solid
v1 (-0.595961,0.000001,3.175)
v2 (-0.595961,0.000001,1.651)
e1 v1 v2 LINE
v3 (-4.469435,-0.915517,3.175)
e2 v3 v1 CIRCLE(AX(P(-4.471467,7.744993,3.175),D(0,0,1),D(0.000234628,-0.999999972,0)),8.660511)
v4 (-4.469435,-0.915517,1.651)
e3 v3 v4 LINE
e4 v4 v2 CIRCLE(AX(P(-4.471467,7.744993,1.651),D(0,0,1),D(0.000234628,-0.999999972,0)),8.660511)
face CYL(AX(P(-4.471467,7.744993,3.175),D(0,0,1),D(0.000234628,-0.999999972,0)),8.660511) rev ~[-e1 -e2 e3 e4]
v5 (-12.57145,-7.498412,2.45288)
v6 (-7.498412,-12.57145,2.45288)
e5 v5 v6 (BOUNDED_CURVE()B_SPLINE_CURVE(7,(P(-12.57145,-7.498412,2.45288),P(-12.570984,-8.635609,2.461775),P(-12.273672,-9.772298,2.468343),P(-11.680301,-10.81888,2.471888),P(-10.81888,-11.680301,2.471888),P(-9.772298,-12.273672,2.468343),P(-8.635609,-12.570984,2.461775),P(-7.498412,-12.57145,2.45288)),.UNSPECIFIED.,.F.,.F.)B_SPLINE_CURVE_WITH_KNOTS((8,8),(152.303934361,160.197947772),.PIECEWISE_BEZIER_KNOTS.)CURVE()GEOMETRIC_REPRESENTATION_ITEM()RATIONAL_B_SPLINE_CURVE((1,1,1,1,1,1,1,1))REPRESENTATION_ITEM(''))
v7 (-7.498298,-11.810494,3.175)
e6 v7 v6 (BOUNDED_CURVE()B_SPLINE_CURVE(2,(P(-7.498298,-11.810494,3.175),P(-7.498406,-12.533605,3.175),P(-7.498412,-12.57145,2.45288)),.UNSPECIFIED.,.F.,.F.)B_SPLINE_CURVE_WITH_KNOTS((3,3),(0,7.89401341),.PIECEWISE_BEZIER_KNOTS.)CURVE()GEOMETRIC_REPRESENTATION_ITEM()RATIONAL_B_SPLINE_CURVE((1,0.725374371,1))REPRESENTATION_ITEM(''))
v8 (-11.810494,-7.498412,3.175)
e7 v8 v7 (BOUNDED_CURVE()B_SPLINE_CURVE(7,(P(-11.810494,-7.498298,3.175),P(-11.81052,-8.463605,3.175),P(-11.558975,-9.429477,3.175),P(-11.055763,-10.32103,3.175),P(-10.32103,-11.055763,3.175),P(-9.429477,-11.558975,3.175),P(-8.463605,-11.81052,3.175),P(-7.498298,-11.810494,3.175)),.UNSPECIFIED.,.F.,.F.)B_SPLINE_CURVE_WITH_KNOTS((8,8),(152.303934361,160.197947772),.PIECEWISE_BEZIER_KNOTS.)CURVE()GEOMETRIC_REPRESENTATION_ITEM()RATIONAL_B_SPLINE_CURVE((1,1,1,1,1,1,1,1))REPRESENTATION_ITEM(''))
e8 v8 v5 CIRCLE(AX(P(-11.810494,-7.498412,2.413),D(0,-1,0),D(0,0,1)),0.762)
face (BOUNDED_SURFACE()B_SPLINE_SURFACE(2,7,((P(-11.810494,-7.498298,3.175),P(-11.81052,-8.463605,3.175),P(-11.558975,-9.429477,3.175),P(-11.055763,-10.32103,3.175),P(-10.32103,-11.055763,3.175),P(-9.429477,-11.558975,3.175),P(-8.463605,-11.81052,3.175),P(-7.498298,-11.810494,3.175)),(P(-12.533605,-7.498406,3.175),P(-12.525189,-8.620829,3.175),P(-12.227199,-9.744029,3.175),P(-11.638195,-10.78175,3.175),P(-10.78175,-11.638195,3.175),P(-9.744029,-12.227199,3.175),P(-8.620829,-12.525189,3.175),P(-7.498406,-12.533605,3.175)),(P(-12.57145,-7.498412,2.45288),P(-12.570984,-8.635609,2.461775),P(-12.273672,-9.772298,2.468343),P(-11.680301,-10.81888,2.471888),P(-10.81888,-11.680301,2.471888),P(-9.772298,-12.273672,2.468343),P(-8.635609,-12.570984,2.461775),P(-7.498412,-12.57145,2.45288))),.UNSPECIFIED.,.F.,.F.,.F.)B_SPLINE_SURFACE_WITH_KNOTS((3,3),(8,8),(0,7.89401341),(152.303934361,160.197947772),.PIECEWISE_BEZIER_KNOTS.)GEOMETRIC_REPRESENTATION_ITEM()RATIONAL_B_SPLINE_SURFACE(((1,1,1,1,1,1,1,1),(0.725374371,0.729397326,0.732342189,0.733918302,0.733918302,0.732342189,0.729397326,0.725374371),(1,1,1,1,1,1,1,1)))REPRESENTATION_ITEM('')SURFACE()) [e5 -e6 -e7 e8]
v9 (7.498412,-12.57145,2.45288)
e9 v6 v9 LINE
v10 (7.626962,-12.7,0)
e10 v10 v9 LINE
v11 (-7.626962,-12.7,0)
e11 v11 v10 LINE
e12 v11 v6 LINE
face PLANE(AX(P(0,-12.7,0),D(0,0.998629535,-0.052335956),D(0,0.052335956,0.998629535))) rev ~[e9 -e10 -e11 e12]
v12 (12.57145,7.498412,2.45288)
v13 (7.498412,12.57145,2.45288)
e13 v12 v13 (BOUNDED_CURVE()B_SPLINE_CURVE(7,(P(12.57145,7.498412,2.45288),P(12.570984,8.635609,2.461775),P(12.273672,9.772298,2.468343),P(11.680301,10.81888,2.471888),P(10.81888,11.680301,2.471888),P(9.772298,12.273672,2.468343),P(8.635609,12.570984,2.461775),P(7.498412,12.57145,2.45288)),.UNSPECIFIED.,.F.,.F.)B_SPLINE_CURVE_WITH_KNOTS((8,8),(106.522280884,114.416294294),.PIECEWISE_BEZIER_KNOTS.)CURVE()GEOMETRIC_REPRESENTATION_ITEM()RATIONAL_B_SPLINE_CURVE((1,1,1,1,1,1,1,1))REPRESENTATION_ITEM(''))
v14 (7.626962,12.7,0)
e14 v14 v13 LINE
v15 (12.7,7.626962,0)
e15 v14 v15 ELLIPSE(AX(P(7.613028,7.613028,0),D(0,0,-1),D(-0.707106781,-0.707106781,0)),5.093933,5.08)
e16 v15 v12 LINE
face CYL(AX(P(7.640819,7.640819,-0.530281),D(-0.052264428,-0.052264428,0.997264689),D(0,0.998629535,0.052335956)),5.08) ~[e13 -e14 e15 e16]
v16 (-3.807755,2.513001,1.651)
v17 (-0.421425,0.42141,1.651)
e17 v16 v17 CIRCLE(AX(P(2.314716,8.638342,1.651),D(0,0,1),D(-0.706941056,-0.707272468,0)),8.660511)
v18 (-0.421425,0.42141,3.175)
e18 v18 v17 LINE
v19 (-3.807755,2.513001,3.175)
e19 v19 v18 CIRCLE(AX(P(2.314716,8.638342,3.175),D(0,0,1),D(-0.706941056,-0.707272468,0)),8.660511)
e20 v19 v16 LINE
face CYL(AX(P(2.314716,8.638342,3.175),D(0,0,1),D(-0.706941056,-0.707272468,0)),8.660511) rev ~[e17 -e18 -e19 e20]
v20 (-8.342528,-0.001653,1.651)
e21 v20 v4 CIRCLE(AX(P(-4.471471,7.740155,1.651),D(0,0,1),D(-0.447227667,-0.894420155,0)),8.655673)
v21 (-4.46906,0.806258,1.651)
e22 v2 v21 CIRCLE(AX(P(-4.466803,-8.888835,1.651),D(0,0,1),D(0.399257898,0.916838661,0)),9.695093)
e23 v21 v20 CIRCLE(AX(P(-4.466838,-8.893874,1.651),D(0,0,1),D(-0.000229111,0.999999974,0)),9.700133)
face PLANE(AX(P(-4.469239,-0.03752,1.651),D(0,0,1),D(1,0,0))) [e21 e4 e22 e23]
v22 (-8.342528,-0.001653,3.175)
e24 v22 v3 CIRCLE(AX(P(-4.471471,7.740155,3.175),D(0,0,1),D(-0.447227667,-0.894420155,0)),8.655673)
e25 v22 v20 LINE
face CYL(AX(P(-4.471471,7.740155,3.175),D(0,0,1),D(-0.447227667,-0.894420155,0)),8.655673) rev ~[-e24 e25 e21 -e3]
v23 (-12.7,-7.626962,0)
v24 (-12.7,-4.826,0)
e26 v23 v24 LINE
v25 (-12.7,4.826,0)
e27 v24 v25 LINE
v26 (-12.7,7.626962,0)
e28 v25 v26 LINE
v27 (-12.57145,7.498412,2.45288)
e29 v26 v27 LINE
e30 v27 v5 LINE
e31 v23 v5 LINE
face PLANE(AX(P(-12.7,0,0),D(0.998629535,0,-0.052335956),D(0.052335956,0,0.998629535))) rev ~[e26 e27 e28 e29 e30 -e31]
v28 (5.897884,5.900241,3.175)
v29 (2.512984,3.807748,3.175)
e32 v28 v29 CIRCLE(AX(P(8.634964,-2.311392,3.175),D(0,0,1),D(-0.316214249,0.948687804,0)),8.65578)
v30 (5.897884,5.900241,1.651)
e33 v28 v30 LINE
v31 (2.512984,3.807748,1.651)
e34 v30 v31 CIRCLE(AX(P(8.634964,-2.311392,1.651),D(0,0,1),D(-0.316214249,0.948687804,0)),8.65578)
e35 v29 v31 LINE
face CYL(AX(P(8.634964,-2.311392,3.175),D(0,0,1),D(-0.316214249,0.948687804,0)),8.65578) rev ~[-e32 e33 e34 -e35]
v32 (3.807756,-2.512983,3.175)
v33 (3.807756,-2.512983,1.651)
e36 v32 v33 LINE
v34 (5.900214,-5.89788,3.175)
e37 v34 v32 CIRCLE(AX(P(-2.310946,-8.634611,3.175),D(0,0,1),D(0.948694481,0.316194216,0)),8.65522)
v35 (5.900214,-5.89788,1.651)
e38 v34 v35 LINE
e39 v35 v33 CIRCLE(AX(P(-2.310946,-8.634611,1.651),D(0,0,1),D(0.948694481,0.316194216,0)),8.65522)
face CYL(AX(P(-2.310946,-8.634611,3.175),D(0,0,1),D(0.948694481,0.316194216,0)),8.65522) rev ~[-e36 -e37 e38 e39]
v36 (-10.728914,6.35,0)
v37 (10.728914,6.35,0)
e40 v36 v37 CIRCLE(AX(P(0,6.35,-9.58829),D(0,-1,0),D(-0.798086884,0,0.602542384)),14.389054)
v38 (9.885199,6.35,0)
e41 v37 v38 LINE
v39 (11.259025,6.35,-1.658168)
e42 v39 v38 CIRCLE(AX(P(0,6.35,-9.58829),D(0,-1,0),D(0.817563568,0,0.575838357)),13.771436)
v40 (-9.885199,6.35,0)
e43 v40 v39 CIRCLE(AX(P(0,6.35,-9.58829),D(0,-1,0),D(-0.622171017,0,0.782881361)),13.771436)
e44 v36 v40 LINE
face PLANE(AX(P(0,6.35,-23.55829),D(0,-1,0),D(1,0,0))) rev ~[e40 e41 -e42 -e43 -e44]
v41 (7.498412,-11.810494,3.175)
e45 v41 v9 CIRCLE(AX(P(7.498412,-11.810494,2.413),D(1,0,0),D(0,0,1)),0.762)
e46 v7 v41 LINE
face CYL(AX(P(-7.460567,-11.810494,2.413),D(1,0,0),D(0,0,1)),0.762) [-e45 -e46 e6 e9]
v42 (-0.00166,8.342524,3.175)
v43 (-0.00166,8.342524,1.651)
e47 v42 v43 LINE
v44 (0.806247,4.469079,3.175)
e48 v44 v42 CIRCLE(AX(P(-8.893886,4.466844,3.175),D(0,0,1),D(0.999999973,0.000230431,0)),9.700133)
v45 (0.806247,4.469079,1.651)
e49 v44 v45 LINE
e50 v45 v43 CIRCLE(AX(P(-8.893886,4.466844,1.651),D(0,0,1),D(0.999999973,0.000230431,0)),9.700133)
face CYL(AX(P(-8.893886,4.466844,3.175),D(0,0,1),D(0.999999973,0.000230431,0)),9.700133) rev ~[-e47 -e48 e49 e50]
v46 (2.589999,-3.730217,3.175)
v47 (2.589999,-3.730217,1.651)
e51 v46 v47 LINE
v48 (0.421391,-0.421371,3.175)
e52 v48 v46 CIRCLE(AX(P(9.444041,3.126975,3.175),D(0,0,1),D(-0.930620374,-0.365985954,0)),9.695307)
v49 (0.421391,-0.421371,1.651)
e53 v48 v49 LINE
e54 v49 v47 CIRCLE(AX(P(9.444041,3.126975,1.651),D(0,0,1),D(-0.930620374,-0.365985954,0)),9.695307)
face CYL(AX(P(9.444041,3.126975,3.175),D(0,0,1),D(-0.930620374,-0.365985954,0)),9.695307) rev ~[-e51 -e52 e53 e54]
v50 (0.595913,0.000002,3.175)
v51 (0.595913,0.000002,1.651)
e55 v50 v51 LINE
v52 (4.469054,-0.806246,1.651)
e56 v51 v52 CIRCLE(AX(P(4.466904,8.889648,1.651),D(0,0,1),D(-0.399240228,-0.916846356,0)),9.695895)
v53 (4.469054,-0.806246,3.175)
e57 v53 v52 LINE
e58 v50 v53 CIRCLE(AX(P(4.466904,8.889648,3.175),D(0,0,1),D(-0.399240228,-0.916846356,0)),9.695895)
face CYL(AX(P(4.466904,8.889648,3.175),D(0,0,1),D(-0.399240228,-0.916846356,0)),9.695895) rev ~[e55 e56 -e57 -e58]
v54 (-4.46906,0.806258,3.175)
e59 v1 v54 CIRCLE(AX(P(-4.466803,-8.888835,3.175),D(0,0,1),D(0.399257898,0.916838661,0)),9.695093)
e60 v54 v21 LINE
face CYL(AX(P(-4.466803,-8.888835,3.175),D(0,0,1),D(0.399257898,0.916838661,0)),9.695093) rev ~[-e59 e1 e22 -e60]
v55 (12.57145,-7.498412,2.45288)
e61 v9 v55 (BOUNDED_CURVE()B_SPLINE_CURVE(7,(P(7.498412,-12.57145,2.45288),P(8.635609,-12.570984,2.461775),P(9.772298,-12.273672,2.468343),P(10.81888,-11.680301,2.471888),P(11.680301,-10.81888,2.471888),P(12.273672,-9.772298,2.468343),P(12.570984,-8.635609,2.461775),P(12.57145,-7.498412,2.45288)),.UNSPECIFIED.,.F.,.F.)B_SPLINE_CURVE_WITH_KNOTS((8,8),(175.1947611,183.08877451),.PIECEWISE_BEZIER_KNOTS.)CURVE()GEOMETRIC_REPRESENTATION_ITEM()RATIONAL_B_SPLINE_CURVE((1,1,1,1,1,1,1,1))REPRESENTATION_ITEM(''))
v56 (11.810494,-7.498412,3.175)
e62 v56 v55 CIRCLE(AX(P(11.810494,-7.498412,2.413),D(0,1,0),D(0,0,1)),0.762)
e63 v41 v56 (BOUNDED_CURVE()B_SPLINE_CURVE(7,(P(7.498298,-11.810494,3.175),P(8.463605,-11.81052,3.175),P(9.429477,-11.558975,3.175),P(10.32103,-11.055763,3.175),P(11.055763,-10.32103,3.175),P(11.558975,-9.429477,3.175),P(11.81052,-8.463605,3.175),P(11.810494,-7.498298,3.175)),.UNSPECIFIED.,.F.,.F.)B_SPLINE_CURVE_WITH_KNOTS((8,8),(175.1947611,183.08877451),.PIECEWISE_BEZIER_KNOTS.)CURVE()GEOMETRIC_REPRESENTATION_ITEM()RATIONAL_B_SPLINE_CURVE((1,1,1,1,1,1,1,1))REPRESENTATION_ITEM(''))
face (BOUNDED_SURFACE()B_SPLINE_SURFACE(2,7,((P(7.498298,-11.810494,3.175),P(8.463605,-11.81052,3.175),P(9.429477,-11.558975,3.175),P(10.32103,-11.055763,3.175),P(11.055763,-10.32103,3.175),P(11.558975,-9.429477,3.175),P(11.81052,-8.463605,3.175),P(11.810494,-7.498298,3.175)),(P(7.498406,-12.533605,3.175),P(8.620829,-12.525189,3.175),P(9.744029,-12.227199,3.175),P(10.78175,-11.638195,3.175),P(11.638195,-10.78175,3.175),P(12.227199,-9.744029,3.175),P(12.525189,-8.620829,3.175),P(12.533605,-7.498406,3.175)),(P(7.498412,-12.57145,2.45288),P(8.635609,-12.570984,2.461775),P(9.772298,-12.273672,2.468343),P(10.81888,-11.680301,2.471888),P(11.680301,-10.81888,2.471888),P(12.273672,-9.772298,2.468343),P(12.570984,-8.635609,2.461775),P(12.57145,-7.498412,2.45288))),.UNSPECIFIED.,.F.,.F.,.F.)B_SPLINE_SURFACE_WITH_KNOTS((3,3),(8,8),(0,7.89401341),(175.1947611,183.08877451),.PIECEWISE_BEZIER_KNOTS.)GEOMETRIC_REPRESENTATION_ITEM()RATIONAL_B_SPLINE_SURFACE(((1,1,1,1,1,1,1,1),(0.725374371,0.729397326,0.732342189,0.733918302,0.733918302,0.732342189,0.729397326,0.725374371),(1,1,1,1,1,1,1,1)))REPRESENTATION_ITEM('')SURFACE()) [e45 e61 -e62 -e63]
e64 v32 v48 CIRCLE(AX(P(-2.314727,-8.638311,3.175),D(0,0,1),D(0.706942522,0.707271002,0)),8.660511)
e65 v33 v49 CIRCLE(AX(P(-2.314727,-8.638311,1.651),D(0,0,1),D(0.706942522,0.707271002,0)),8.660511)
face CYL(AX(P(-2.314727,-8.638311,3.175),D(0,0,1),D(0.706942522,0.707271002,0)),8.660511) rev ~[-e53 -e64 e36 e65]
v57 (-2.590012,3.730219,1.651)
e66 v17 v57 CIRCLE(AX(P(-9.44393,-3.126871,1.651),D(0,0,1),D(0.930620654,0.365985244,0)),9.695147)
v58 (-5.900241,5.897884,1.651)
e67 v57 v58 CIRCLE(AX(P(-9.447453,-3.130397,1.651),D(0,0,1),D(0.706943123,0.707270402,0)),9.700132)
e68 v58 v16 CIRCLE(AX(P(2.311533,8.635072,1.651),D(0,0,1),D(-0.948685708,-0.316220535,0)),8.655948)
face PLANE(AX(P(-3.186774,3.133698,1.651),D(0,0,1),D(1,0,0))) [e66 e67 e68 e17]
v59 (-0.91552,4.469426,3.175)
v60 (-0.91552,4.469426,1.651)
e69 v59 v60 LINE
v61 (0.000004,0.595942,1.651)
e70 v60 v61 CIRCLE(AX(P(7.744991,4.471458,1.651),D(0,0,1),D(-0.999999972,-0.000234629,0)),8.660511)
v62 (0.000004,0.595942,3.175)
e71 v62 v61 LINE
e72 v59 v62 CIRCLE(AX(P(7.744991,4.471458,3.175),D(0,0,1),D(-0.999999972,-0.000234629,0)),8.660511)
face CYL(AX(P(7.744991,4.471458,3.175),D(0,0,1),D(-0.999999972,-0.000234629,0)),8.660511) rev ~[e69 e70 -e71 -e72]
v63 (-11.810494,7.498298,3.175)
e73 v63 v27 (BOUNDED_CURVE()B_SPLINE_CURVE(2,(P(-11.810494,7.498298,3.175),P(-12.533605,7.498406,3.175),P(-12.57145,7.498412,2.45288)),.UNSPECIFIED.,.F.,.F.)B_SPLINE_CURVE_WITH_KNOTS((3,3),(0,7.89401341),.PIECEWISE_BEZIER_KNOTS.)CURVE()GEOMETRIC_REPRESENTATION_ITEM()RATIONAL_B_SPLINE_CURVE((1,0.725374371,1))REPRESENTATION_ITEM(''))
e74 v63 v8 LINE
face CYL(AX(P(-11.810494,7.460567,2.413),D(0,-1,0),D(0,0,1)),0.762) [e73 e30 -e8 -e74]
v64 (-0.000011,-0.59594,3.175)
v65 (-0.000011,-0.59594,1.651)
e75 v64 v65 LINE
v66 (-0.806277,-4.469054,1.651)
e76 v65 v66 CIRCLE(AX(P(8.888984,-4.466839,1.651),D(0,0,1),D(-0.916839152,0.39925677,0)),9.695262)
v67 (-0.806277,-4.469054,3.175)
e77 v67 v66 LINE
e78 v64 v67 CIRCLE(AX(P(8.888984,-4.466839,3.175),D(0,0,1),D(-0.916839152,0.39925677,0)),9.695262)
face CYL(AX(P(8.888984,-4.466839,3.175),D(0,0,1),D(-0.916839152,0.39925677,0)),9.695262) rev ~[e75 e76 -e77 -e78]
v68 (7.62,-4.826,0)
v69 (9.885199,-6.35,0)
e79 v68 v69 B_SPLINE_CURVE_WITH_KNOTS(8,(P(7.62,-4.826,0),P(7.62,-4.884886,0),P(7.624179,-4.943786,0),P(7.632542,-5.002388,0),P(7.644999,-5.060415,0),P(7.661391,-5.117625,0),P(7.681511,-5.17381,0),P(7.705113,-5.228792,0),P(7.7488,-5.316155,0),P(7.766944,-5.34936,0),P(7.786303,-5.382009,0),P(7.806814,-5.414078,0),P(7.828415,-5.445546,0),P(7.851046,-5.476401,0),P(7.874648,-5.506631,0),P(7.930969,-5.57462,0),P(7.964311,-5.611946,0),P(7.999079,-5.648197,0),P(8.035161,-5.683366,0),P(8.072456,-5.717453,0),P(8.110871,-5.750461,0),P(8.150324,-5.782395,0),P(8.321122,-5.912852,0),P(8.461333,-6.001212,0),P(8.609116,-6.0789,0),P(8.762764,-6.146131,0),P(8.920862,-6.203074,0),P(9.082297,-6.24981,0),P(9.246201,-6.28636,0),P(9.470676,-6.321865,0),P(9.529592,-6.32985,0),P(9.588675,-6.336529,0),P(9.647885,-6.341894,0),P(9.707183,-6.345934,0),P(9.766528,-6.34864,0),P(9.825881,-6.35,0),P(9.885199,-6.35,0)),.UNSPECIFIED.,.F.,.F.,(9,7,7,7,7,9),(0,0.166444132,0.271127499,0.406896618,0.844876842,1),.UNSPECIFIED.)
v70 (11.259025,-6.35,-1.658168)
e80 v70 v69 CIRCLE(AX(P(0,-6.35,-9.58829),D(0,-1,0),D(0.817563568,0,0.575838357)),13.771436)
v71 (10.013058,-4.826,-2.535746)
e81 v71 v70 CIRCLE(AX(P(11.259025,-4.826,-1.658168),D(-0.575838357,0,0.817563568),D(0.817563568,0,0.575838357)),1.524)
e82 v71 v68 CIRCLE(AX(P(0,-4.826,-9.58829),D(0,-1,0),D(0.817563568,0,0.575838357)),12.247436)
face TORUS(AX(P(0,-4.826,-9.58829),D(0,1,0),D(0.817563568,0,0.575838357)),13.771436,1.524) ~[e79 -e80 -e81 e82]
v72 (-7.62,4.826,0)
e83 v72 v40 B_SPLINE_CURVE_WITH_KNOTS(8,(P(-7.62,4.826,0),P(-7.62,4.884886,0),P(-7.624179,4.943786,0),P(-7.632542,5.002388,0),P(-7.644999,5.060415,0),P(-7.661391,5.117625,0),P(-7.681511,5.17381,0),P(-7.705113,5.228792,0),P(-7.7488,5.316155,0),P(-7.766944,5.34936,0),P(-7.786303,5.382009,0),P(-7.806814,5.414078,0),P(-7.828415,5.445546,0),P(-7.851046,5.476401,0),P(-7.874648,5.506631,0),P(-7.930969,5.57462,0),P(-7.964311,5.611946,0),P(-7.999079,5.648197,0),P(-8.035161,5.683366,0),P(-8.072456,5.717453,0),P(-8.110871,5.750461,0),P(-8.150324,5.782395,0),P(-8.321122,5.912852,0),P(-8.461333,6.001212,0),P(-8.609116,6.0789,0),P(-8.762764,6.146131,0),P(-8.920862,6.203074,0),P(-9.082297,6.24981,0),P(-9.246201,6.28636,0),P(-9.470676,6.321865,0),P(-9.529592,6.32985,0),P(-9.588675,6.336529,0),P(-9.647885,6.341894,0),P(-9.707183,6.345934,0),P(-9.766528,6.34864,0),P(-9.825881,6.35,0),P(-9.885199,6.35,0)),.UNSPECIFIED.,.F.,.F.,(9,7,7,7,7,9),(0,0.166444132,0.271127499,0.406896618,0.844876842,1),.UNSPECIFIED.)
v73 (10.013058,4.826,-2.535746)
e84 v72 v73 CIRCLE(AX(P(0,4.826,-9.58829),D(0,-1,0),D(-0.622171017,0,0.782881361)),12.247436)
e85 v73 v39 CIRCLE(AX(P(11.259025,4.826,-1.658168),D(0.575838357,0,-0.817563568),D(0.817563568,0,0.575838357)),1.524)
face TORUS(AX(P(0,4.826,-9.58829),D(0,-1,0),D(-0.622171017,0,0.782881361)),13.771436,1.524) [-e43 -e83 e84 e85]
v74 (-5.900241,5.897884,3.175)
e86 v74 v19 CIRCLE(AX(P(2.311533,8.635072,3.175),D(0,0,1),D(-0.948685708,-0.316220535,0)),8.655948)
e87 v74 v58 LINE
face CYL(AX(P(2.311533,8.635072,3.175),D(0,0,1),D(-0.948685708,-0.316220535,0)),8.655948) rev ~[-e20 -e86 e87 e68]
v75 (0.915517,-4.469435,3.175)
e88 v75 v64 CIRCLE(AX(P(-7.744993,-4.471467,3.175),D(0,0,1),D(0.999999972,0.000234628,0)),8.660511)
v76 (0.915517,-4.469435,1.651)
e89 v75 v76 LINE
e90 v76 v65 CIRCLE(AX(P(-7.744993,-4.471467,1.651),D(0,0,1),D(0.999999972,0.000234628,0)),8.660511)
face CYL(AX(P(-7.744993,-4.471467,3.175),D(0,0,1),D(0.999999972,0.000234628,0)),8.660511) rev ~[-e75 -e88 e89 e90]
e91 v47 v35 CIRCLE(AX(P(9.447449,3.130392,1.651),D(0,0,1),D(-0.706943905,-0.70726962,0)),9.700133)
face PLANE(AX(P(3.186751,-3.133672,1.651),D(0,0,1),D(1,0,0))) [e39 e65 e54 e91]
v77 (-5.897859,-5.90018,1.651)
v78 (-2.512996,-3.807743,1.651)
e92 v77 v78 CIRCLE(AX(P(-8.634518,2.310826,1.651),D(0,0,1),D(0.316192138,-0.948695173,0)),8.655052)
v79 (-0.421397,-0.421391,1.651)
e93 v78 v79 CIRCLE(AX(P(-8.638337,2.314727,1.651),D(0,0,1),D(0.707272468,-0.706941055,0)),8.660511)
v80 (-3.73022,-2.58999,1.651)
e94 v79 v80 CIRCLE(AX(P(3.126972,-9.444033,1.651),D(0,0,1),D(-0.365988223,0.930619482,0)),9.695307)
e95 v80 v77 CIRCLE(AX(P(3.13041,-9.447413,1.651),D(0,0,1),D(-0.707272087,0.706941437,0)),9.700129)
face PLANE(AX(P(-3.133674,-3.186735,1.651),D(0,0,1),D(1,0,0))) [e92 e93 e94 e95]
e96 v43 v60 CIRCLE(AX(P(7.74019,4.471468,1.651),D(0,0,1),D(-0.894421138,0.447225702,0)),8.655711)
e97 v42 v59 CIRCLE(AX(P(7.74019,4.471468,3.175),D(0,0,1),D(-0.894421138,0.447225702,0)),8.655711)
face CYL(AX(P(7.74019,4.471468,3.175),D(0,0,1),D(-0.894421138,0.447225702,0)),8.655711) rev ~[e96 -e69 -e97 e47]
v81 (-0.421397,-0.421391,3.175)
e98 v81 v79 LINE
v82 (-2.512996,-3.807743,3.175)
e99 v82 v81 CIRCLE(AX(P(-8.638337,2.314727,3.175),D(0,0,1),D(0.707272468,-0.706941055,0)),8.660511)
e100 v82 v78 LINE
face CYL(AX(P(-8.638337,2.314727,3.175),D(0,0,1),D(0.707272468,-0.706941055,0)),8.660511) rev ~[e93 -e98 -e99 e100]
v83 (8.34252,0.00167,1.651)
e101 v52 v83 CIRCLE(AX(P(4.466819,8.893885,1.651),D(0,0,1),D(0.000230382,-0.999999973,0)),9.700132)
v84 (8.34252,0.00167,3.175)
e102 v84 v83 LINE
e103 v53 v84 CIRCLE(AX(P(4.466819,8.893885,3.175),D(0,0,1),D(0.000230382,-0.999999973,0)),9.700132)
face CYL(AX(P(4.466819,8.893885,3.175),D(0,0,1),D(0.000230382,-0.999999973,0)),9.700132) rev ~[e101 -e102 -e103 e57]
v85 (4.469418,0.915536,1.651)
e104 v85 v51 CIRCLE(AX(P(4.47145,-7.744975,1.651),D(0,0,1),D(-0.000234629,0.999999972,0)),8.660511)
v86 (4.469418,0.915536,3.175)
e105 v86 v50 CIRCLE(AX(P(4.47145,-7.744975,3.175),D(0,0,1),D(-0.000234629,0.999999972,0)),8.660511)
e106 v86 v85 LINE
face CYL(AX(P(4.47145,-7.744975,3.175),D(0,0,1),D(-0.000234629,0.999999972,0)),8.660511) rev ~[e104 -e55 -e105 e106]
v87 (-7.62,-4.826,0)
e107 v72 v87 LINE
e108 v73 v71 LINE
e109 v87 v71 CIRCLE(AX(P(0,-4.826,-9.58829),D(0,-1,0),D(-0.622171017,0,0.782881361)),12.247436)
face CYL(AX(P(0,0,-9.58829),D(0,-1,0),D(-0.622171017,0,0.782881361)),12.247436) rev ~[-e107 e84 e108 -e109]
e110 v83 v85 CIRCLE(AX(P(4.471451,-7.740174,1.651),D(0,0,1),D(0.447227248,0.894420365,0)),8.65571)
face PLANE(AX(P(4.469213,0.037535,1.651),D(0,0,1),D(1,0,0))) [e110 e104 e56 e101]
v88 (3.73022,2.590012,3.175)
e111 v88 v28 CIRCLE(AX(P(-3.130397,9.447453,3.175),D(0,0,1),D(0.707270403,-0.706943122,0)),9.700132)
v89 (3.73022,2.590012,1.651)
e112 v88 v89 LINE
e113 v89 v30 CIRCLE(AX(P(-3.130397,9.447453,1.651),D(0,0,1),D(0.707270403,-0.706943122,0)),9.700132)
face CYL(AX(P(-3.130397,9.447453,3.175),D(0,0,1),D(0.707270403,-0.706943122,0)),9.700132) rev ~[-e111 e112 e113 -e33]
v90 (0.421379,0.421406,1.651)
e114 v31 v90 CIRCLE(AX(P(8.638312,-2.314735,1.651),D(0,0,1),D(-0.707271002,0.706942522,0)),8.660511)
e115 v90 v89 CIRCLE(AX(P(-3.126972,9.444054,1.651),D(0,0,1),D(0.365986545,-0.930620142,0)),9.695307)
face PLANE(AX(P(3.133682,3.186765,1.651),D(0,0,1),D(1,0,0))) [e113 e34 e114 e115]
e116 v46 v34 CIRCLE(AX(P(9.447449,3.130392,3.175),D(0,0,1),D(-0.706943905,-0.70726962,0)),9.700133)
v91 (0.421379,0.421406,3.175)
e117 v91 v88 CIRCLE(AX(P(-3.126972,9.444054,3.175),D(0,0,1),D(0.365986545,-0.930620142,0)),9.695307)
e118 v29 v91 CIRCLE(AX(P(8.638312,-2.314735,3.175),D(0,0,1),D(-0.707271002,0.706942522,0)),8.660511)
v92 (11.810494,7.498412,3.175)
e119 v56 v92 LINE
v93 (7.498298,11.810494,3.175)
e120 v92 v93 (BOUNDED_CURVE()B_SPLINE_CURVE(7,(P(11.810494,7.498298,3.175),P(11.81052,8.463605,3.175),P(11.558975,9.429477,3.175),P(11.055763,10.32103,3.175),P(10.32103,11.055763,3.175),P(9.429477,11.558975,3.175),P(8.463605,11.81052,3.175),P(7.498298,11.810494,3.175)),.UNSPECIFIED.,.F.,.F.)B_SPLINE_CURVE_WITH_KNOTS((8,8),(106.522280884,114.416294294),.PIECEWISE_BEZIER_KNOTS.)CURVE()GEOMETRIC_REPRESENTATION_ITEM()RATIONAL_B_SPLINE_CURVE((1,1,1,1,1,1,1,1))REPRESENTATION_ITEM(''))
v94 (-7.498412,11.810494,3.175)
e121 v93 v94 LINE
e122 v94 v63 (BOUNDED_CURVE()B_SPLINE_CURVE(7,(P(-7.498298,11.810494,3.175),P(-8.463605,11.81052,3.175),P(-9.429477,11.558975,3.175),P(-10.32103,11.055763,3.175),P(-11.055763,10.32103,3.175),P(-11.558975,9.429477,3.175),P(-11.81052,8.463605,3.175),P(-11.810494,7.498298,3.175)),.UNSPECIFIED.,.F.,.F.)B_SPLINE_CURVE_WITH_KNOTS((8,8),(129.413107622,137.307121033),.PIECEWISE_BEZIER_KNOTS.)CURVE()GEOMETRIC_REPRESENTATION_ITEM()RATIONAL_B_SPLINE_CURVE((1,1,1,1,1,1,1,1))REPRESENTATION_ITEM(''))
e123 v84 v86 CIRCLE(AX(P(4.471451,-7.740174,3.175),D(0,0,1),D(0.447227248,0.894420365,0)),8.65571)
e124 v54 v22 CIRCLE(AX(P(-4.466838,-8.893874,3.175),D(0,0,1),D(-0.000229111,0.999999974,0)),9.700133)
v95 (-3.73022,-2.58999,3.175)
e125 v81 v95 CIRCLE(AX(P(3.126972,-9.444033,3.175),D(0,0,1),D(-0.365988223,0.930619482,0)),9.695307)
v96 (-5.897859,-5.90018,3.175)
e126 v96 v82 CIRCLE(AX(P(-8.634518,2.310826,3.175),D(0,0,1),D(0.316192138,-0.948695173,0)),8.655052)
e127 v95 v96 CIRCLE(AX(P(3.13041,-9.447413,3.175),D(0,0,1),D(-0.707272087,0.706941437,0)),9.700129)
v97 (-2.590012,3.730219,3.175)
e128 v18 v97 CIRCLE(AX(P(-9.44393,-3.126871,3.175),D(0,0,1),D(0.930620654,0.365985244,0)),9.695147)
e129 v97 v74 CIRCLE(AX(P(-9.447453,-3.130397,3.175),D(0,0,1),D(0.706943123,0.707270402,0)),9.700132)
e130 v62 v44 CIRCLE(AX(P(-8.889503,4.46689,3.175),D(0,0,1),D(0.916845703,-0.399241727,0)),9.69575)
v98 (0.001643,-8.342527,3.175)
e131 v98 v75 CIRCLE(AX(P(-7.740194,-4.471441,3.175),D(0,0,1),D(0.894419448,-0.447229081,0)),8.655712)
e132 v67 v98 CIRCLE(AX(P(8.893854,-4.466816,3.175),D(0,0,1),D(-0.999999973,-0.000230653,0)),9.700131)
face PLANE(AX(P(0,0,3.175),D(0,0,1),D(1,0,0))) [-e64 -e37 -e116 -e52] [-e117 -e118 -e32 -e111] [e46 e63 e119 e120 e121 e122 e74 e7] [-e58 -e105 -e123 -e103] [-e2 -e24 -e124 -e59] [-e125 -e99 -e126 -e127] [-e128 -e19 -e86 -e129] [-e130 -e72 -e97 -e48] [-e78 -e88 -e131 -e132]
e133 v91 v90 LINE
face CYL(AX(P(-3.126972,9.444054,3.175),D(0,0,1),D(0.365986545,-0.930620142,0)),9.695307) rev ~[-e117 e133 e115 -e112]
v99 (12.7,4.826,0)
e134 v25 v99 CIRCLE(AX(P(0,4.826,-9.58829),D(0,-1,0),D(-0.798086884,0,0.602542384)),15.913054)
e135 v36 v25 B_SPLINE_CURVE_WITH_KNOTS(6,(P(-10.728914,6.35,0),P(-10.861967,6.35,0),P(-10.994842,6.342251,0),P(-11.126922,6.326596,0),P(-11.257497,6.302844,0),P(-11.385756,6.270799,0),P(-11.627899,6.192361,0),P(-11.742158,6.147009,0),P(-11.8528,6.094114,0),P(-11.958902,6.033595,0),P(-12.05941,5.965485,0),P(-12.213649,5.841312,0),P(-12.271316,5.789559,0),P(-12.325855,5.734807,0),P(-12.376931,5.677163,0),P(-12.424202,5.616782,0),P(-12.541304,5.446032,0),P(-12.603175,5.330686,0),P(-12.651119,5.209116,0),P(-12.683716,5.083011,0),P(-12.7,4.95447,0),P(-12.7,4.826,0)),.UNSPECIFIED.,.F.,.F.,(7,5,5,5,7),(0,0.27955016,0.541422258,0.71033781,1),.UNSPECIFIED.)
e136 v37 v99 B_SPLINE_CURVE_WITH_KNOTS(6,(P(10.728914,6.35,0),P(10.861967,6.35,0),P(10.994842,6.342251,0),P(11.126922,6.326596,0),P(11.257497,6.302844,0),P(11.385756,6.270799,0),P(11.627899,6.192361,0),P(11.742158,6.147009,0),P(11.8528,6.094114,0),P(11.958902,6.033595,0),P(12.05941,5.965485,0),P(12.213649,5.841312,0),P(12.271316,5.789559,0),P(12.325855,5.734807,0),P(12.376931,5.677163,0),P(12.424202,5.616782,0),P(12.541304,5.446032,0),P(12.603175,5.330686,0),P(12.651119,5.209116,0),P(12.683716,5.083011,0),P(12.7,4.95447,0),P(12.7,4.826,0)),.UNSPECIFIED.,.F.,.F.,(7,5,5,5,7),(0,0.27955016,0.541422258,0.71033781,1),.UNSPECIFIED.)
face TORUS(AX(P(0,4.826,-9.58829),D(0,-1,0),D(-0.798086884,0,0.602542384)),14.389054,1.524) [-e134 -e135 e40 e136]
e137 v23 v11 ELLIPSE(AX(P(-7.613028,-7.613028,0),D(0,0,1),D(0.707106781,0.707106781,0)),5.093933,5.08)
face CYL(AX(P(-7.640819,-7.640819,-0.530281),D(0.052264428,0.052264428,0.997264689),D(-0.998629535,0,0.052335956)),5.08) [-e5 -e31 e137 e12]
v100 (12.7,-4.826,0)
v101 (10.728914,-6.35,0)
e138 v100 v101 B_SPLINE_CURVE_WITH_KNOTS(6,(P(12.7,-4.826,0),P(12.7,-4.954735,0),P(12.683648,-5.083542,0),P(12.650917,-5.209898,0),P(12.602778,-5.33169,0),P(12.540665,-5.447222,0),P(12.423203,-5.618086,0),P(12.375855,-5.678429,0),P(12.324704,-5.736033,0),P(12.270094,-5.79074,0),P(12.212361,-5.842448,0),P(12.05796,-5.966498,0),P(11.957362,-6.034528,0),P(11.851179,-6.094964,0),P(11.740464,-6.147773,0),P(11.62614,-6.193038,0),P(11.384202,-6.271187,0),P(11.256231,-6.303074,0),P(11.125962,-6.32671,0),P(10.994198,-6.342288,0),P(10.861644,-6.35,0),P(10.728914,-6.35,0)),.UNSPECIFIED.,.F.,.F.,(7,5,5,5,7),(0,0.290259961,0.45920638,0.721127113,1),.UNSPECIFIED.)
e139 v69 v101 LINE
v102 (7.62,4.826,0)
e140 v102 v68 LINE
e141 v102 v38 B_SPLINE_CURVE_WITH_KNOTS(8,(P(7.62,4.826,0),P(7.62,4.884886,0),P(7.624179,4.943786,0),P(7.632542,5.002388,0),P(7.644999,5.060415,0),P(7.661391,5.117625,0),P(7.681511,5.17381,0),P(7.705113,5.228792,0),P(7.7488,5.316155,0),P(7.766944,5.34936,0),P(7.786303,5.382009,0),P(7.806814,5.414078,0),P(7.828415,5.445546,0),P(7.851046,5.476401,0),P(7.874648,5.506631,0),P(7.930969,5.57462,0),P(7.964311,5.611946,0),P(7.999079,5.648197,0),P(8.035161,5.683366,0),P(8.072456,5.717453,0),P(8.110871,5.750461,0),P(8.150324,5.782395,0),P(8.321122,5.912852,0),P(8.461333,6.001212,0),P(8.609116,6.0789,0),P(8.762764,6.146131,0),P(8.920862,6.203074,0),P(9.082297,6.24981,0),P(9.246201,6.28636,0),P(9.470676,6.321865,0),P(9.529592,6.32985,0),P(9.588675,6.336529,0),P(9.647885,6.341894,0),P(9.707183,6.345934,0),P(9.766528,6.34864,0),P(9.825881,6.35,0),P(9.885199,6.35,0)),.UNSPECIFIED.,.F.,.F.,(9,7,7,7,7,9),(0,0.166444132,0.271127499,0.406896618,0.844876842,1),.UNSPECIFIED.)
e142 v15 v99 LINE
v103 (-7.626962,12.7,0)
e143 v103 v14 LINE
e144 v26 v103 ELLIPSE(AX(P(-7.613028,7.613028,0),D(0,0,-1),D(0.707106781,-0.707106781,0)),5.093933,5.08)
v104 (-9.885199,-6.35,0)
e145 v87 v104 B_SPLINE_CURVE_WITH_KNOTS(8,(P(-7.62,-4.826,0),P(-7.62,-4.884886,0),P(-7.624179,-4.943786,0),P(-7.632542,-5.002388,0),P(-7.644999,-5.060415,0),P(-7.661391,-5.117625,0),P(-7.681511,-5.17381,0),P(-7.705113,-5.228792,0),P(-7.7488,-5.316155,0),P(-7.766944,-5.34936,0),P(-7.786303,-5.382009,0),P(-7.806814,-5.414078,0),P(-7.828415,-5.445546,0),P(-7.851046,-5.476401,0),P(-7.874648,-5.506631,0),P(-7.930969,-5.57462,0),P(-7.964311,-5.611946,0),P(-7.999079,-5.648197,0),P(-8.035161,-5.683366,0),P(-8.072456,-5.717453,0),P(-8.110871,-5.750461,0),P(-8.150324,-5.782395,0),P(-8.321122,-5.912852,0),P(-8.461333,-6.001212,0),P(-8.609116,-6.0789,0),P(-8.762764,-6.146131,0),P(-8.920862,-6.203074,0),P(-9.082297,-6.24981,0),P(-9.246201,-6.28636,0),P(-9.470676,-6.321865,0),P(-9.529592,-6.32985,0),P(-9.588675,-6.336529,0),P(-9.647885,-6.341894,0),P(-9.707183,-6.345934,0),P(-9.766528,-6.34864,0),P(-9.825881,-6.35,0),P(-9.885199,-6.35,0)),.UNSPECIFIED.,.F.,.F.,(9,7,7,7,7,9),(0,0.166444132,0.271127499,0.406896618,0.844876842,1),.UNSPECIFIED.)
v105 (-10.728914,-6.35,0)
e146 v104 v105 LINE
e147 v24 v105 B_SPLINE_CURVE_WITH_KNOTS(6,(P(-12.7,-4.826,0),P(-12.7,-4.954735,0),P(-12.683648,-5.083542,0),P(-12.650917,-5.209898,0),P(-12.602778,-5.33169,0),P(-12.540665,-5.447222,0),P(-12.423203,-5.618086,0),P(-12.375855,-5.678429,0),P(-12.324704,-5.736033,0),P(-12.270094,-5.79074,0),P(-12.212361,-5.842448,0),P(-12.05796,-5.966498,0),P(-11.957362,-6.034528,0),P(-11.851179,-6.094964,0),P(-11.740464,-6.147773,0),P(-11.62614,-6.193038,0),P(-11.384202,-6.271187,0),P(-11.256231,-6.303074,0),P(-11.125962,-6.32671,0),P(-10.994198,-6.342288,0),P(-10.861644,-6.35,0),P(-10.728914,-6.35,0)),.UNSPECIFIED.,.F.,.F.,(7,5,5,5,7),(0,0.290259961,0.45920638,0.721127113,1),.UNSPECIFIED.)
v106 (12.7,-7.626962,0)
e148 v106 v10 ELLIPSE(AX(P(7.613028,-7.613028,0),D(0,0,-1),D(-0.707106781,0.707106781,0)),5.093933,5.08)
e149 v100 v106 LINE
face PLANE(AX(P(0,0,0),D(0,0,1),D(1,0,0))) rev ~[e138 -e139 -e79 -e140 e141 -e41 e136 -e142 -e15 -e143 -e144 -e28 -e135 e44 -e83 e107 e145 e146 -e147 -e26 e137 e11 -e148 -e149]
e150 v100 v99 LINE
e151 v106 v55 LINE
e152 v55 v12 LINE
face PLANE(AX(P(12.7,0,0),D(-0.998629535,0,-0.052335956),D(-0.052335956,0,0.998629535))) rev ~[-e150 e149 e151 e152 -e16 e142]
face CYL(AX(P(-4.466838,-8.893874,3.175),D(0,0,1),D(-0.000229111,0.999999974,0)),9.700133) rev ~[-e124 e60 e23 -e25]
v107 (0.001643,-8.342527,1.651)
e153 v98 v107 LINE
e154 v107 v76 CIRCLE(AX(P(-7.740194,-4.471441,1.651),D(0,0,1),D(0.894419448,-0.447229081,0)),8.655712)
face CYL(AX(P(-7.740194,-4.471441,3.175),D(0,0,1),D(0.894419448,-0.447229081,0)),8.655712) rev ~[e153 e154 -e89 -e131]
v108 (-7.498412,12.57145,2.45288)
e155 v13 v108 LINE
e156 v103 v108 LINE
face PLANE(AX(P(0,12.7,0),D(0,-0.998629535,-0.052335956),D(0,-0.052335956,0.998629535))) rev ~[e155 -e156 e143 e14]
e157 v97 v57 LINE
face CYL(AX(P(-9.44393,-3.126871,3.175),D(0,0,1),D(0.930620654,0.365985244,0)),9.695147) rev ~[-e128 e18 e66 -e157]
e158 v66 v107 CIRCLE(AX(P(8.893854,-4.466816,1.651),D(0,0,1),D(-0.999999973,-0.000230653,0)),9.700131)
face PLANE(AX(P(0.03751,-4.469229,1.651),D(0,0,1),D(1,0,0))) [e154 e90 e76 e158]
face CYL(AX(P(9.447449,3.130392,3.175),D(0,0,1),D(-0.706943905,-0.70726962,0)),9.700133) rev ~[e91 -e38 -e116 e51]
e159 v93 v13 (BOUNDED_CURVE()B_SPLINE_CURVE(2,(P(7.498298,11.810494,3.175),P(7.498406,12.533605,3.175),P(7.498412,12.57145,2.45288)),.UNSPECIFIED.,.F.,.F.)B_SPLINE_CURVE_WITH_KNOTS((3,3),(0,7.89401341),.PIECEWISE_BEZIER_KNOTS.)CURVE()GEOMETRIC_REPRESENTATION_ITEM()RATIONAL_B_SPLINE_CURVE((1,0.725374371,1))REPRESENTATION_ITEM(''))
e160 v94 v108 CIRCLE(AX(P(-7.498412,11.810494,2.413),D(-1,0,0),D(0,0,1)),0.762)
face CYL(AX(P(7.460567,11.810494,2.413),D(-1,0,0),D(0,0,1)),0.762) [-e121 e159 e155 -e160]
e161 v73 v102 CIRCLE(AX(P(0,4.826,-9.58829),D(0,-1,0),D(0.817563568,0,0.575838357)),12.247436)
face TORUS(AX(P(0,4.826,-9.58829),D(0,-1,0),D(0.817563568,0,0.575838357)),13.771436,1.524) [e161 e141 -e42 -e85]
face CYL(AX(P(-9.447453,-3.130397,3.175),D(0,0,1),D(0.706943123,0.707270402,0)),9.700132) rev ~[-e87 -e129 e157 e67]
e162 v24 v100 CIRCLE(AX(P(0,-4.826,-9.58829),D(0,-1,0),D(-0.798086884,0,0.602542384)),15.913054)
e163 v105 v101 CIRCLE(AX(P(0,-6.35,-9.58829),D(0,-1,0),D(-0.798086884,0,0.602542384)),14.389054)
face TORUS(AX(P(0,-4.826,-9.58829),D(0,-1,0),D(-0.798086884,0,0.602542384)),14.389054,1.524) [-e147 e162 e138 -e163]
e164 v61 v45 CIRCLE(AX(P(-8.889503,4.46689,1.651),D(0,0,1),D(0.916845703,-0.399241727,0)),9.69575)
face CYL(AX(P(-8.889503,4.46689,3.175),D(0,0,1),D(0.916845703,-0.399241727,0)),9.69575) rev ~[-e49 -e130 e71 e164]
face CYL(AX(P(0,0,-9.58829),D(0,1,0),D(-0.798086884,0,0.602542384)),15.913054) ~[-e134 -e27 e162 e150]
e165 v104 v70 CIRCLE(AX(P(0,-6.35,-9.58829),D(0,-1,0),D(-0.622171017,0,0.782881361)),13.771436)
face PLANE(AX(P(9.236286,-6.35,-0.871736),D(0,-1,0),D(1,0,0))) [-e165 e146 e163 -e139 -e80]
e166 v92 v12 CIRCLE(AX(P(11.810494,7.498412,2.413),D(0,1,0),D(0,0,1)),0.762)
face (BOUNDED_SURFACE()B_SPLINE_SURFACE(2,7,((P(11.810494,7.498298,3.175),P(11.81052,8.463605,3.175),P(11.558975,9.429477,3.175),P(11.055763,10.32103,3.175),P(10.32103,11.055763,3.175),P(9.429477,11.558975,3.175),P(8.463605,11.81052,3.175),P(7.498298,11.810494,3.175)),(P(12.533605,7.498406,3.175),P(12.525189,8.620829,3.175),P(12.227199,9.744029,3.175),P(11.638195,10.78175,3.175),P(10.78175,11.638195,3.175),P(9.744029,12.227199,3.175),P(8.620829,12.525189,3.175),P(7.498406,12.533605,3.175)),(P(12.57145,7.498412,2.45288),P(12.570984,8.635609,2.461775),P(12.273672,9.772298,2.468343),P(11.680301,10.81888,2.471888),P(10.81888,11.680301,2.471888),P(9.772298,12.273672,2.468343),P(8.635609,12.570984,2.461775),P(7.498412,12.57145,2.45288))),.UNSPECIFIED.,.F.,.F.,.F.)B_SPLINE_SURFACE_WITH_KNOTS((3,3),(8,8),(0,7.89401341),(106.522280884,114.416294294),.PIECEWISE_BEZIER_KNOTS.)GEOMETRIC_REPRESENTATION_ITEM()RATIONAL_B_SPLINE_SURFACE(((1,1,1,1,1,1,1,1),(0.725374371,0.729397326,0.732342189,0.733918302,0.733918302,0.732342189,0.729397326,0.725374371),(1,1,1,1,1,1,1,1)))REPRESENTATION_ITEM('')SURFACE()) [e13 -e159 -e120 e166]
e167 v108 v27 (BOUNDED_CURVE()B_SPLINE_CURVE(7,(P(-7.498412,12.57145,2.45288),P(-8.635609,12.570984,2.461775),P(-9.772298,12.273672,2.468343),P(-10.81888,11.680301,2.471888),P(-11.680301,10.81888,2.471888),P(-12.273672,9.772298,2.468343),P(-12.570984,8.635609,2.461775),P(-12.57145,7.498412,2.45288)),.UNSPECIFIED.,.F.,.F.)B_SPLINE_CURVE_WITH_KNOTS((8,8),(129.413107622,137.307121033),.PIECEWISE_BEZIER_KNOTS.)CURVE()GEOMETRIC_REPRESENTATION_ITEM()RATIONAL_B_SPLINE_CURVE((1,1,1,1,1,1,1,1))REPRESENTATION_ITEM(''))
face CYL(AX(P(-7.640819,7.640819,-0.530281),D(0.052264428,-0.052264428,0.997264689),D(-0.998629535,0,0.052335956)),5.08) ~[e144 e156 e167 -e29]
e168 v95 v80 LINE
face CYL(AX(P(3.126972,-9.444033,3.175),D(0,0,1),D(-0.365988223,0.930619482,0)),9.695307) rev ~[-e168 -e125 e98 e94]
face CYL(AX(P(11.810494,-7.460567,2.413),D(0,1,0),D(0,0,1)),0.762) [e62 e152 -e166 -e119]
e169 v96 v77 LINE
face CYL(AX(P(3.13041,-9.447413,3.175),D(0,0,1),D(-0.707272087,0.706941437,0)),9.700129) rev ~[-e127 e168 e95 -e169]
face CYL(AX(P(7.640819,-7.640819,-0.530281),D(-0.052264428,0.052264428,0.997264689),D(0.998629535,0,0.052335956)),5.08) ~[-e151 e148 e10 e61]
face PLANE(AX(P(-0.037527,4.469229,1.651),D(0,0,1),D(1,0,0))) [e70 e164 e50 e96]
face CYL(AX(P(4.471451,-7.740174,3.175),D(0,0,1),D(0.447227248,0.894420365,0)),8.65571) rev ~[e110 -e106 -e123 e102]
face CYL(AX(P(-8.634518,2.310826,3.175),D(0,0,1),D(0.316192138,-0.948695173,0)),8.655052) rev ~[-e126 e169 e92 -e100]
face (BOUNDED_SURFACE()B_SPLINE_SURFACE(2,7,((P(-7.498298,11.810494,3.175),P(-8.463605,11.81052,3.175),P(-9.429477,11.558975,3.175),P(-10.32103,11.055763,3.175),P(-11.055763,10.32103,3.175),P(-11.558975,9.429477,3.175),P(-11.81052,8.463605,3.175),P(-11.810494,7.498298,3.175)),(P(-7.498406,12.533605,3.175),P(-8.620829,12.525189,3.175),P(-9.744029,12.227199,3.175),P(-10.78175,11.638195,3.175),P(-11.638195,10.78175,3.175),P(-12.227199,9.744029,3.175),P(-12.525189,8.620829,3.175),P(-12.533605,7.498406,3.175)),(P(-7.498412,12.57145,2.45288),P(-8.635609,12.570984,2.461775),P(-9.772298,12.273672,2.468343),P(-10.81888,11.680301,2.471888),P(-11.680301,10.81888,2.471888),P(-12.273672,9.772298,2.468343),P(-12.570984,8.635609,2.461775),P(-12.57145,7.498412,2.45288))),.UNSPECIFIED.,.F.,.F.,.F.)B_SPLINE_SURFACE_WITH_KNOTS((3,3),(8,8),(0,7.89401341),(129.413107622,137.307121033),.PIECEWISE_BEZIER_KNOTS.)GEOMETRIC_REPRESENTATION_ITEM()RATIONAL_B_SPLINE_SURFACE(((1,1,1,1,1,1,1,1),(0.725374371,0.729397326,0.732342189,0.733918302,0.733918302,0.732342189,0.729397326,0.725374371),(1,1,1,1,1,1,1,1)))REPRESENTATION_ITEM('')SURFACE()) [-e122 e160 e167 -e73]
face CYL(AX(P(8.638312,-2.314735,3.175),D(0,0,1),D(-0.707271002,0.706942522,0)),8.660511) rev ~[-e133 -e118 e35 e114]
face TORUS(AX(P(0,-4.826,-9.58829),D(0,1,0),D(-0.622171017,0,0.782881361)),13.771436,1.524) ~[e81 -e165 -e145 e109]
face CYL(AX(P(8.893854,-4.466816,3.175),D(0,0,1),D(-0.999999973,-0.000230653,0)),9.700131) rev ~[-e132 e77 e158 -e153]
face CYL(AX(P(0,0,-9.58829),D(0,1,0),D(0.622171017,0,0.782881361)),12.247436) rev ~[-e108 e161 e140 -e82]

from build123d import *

# Parameters (mm, degrees)
F0_W          = 25.4
F0_H          = 25.4
F1_DEPTH      = 3.175
F1_TAPER      = 3
F3_W          = 5.08
F3_H          = 12.7
F6_DEPTH      = 6.35
F6_DEPTH_BACK = 6.35
F7_R          = 5.08
F8_R          = 1.524
F9_R          = 0.762
F11_DEPTH     = 1.524


# Not quite as in the source:
# - ends of sketch curves that miss each other by under 0.0002 mm in the source are joined


with BuildPart() as f1:
    # F0 (on Top) → F1 (new body)
    with BuildSketch(Plane.XY):
        Rectangle(F0_W, F0_H)
    extrude(amount=F1_DEPTH, taper=F1_TAPER)

    # F4: sweep along a path in F2
    with BuildLine(Plane.XZ) as f4_path:
        ThreePointArc((-10.16, 0), (0, -23.5582897328), (10.16, 0))
    # F3 (on face) → F4 (sweep)
    with BuildSketch(Plane(origin=(0, 0, 0), x_dir=(1, 0, 0), z_dir=(0, 0, -1))):
        with Locations((-10.16, 0)):
            Rectangle(F3_W, F3_H)
    sweep(path=f4_path.line)

    # F5 (on Front) → F6 (join, two sides)
    with BuildSketch(Plane.XZ) as f6_sk:
        with BuildLine():
            Line((10.0130578512, -2.535746045), (10.16, 0))
            Line((10.16, 0), (7.62, 0))
            ThreePointArc((7.62, 0), (8.9072265211, -1.1822790439), (10.0130578512, -2.535746045))
        make_face()
    extrude(amount=F6_DEPTH)
    extrude(f6_sk.sketch, amount=-F6_DEPTH_BACK)

    # F7
    f7_edges = [f1.edges().sort_by_distance(p)[0] for p in [
        (-12.616803, 12.616803, 1.5875),
        (12.616803, 12.616803, 1.5875),
        (12.616803, -12.616803, 1.5875),
        (-12.616803, -12.616803, 1.5875),
    ]]
    fillet(f7_edges, radius=F7_R)

    # F8
    f8_edges = [f1.edges().sort_by_distance(p)[0] for p in [
        (-1.743325, -6.35, -21.711017),
        (8.907227, -6.35, -1.182279),
        (-1.743325, 6.35, -21.711017),
        (0, -6.35, -25.501344),
        (0, 6.35, -25.501344),
        (8.907227, 6.35, -1.182279),
    ]]
    fillet(f8_edges, radius=F8_R)

    # F9
    f9_edges = [f1.edges().sort_by_distance(p)[0] for p in [
        (12.533605, 0, 3.175),
        (11.048589, -11.048589, 3.175),
        (11.048589, 11.048589, 3.175),
        (0, -12.533605, 3.175),
        (0, 12.533605, 3.175),
        (-11.048589, -11.048589, 3.175),
        (-11.048589, 11.048589, 3.175),
        (-12.533605, 0, 3.175),
    ]]
    fillet(f9_edges, radius=F9_R)

    # F10 (on face) → F11 (cut)
    with BuildSketch(Plane.XY.offset(3.175)):
        with BuildLine():
            ThreePointArc((-0.9155201148, 4.4694258476), (-0.6832986187, 2.4793758179), (3.5409e-06, 0.595941693))
            ThreePointArc((3.5409e-06, 0.595941693), (0.6027711391, 2.4909604976), (0.8062465423, 4.4690792099))
            ThreePointArc((0.8062465423, 4.4690792099), (0.6018941572, 6.4474337167), (-0.0016602711, 8.3425243592))
            ThreePointArc((-0.0016602711, 8.3425243592), (-0.6841903658, 6.4592148863), (-0.9155201148, 4.4694258476))
        make_face()
        with BuildLine():
            ThreePointArc((-3.8077546959, 2.5130013299), (-2.2363761453, 1.2700310995), (-0.42142512, 0.4214096769))
            ThreePointArc((-0.42142512, 0.4214096769), (-1.3351515877, 2.1875999181), (-2.5900116585, 3.730219495))
            ThreePointArc((-2.5900116585, 3.730219495), (-4.1334248315, 4.984630209), (-5.9002408115, 5.8978835339))
            ThreePointArc((-5.9002408115, 5.8978835339), (-5.0511485615, 4.0835502168), (-3.8077546959, 2.5130013299))
        make_face()
        with BuildLine():
            ThreePointArc((-4.4694348001, -0.9155173616), (-2.4793902981, -0.6832971735), (-0.5959608043, 1.2077e-06))
            ThreePointArc((-0.5959608043, 1.2077e-06), (-2.4909447448, 0.6027830722), (-4.4690604127, 0.8062578417))
            ThreePointArc((-4.4690604127, 0.8062578417), (-6.4474325455, 0.601904437), (-8.3425275239, -0.00165301))
            ThreePointArc((-8.3425275239, -0.00165301), (-6.4592135153, -0.6841876238), (-4.4694348001, -0.9155173616))
        make_face()
        with BuildLine():
            ThreePointArc((-2.5129958106, -3.8077433876), (-1.2700192482, -2.2363545852), (-0.4213965439, -0.4213909469))
            ThreePointArc((-0.4213965439, -0.4213909469), (-2.1876007302, -1.3351301119), (-3.7302203071, -2.5899901827))
            ThreePointArc((-3.7302203071, -2.5899901827), (-4.9846026422, -4.1333687575), (-5.8978587184, -5.9001801375))
            ThreePointArc((-5.8978587184, -5.9001801375), (-4.0835524313, -5.0511464123), (-2.5129958106, -3.8077433876))
        make_face()
        with BuildLine():
            ThreePointArc((0.9155173616, -4.4694348001), (0.6832945611, -2.4793792452), (-1.13725e-05, -0.5959404907))
            ThreePointArc((-1.13725e-05, -0.5959404907), (-0.6027958982, -2.4909317217), (-0.8062773019, -4.4690538311))
            ThreePointArc((-0.8062773019, -4.4690538311), (-0.6019215796, -6.4474219971), (0.0016427937, -8.3425269237))
            ThreePointArc((0.0016427937, -8.3425269237), (0.6841820315, -6.4592115317), (0.9155173616, -4.4694348001))
        make_face()
        with BuildLine():
            ThreePointArc((3.8077560876, -2.5129831047), (2.2363622238, -1.2699985662), (0.4213909469, -0.4213711439))
            ThreePointArc((0.4213909469, -0.4213711439), (1.3351322844, -2.1875874429), (2.5899988338, -3.7302169049))
            ThreePointArc((2.5899988338, -3.7302169049), (4.1334023383, -4.9846239173), (5.9002137183, -5.8978799935))
            ThreePointArc((5.9002137183, -5.8978799935), (5.0511591496, -4.083539721), (3.8077560876, -2.5129831047))
        make_face()
        with BuildLine():
            ThreePointArc((4.4694176698, 0.9155360845), (2.4793565872, 0.6833119761), (0.5959132016, 2.2641e-06))
            ThreePointArc((0.5959132016, 2.2641e-06), (2.4909366376, -0.6027661111), (4.4690537829, -0.8062464814))
            ThreePointArc((4.4690537829, -0.8062464814), (6.4474197136, -0.6018917801), (8.3425203043, 0.0016695744))
            ThreePointArc((8.3425203043, 0.0016695744), (6.4592208932, 0.6842008215), (4.4694176698, 0.9155360845))
        make_face()
        with BuildLine():
            ThreePointArc((2.5129838216, 3.8077483112), (1.2700056151, 2.2363646991), (0.4213794744, 0.4214060353))
            ThreePointArc((0.4213794744, 0.4214060353), (2.1875900431, 1.3351451192), (3.7302195051, 2.5900116686))
            ThreePointArc((3.7302195051, 2.5900116686), (4.984630209, 4.1334248315), (5.8978835339, 5.9002408115))
            ThreePointArc((5.8978835339, 5.9002408115), (4.0835473797, 5.0511570071), (2.5129838216, 3.8077483112))
        make_face()
    extrude(amount=-F11_DEPTH, mode=Mode.SUBTRACT)


solid = f1.part
